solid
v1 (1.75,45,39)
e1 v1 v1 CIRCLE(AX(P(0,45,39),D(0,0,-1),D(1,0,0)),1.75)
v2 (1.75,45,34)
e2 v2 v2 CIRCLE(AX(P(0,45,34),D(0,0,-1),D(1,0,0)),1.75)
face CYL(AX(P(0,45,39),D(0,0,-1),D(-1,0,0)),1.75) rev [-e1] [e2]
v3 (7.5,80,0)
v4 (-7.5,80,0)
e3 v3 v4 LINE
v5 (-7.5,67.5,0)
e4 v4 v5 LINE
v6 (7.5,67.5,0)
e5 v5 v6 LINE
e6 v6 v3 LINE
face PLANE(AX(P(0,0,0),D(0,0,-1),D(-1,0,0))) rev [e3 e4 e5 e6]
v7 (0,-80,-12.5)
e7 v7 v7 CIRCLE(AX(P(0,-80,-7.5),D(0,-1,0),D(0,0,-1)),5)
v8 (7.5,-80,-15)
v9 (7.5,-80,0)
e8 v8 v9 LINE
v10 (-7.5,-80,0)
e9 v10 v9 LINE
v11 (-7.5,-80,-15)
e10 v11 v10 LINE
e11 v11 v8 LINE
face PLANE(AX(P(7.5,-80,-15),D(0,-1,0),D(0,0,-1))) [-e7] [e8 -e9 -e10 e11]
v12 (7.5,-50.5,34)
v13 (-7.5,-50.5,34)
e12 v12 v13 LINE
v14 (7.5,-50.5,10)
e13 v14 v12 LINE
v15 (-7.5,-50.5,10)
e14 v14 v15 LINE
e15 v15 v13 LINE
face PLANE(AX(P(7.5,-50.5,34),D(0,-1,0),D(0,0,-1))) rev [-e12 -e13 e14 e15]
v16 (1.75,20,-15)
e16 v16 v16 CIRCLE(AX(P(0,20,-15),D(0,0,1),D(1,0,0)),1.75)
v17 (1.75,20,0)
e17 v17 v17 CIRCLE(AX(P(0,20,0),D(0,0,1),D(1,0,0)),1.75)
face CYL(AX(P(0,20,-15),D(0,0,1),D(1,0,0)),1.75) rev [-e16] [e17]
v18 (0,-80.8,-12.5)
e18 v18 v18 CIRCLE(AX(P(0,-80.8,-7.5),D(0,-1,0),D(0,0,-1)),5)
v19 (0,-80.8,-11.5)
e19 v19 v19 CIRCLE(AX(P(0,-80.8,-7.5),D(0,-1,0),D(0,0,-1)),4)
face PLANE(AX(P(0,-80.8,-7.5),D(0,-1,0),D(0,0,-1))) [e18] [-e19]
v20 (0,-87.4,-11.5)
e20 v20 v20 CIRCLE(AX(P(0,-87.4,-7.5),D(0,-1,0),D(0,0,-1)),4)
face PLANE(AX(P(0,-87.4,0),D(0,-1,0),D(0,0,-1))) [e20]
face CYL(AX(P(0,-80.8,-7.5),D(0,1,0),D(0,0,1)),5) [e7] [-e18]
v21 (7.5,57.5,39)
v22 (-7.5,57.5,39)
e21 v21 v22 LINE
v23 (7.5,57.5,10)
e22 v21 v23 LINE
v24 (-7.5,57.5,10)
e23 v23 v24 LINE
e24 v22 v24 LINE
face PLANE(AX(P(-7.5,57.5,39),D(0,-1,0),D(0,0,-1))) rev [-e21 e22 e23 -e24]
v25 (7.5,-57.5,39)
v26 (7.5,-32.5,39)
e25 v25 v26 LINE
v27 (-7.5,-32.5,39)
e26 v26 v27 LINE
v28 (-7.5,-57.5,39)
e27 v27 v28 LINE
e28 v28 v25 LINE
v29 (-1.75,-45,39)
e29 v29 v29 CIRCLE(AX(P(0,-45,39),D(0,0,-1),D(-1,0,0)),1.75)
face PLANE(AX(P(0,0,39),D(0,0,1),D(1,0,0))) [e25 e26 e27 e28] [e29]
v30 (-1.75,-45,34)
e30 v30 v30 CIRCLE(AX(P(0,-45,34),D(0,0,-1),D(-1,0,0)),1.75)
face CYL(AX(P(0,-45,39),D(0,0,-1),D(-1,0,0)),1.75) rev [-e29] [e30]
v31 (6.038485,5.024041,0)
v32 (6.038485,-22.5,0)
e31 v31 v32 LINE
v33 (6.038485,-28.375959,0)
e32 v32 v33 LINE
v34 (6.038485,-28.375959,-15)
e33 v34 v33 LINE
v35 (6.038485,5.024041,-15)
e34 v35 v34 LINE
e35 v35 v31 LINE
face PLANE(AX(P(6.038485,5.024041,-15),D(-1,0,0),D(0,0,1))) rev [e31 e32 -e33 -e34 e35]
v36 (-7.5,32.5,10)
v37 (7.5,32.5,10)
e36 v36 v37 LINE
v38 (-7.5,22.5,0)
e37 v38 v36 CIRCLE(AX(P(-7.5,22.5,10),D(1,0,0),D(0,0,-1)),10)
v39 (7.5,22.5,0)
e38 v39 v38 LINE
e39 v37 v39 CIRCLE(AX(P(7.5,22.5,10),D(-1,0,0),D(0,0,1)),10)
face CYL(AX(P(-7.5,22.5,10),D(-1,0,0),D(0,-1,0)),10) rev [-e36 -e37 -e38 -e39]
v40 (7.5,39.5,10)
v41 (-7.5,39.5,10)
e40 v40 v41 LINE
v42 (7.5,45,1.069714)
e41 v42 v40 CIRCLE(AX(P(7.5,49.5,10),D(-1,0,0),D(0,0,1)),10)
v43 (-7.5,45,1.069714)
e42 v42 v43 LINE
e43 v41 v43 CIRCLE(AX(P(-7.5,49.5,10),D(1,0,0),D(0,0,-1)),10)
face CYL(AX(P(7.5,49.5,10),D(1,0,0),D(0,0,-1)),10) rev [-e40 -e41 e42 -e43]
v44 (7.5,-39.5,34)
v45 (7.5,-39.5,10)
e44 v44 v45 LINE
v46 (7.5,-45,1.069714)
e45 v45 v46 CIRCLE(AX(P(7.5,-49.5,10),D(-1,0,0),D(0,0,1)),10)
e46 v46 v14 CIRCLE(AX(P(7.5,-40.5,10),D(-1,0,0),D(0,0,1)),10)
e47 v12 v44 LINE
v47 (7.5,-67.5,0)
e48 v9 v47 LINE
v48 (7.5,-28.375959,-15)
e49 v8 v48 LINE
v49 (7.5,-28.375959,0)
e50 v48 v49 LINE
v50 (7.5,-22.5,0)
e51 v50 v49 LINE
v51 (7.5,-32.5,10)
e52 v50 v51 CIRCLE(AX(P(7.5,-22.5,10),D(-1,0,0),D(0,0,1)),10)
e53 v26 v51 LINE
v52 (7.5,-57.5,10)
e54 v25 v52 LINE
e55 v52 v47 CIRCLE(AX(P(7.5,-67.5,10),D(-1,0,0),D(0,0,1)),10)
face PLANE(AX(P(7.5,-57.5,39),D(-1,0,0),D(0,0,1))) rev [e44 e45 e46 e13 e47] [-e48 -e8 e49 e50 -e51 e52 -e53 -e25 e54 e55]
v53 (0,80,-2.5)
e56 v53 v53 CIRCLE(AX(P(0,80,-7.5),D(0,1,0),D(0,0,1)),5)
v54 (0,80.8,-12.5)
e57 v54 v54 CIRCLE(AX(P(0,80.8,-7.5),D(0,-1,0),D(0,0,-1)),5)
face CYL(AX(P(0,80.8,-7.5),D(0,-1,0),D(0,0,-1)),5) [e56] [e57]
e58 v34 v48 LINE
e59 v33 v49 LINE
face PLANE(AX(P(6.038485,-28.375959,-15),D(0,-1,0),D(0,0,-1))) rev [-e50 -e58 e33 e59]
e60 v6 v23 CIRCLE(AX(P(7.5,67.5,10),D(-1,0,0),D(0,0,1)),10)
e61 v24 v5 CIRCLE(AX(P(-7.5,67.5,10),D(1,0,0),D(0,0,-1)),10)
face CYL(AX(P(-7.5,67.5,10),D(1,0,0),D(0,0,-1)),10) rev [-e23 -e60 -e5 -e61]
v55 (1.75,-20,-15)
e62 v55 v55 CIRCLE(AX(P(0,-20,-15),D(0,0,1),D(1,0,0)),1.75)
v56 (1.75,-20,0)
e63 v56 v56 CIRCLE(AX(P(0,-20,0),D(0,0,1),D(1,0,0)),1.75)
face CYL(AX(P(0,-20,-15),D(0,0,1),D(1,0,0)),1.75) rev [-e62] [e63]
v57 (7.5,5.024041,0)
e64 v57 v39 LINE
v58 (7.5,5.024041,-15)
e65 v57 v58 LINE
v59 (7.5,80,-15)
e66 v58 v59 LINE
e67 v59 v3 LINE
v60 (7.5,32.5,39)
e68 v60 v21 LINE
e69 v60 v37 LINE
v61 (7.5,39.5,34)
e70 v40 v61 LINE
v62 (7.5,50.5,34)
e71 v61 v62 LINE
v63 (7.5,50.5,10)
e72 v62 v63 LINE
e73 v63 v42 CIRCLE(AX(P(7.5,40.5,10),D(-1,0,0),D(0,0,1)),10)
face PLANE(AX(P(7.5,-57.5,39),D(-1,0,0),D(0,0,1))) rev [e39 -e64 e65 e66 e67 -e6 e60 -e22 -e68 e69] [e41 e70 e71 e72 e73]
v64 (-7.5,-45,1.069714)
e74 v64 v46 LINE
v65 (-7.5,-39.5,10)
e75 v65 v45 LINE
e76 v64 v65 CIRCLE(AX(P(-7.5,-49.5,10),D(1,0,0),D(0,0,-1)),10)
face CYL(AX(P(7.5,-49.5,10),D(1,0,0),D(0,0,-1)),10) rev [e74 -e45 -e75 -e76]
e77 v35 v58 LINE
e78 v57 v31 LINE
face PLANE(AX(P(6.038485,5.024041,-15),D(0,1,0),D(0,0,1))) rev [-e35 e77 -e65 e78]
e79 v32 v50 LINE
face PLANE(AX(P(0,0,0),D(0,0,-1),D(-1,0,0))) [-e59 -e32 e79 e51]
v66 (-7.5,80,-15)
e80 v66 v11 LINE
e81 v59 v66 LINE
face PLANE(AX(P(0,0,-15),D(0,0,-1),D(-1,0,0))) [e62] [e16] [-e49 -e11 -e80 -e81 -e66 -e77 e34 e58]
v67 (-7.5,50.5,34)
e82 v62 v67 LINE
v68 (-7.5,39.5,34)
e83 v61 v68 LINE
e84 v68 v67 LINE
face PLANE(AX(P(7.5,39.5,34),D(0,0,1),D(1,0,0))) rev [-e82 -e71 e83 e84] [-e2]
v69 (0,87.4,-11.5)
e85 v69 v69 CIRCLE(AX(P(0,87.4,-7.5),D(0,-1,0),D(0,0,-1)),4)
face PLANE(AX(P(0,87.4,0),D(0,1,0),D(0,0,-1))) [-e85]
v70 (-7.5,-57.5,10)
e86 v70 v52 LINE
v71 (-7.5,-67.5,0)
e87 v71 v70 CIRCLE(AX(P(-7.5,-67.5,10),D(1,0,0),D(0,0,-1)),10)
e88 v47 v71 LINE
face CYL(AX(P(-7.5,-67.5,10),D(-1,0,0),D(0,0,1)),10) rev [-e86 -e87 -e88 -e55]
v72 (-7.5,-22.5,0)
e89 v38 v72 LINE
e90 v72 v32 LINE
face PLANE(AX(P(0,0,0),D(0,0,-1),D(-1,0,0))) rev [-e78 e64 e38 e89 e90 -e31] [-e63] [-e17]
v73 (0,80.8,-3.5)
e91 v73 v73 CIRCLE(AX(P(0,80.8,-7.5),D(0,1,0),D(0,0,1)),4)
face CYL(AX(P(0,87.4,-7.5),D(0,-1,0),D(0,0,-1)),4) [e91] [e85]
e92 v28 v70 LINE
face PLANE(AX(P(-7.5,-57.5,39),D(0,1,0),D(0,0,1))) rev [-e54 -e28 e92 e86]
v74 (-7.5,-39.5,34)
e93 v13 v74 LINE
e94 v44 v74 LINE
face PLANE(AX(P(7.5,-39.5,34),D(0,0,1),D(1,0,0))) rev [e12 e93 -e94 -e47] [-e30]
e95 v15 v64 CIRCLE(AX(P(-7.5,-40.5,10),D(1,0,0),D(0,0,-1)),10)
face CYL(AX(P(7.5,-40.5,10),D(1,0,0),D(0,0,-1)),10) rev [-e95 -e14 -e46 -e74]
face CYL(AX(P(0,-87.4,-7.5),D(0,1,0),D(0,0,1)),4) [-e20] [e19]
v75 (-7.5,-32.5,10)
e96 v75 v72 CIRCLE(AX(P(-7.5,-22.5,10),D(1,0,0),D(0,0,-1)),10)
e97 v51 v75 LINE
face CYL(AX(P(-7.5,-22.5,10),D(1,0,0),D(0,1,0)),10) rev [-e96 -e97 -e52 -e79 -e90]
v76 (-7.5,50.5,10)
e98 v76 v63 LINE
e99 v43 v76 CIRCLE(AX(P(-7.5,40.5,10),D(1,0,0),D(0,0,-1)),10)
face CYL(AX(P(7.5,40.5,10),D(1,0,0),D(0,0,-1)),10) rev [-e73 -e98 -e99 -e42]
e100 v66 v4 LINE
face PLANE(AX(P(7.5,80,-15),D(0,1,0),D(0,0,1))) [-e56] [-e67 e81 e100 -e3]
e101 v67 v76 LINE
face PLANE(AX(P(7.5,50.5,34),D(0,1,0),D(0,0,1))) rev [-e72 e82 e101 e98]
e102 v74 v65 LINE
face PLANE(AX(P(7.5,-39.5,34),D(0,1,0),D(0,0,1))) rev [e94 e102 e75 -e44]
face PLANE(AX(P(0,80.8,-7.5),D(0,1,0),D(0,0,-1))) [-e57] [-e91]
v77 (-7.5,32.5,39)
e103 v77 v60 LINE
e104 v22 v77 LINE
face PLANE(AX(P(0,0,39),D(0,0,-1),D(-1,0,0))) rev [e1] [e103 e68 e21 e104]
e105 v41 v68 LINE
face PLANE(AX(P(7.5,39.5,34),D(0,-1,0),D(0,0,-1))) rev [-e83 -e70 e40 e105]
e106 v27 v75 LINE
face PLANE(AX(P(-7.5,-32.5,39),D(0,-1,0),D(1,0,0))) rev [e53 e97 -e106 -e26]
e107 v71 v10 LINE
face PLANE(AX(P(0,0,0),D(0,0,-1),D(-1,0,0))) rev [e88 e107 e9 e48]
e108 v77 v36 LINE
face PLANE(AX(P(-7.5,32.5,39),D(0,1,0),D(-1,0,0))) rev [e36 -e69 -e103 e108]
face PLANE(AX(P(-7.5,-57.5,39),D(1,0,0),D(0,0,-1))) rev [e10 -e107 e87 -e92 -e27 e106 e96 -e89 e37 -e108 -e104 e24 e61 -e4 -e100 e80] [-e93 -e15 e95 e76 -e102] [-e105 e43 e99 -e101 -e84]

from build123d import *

# Parameters (mm, degrees)
ESQUISSE1_W                      = 25
ESQUISSE1_H                      = 15
BOSS_EXTRU_1_DEPTH               = 39
BOSS_EXTRU_1_2_DEPTH             = 39
ESQUISSE3_W                      = 160
ESQUISSE3_H                      = 15
BOSS_EXTRU_2_DEPTH               = 15
ESQUISSE4_R                      = 5
ESQUISSE4_R_2                    = 4
BOSS_EXTRU_5_DEPTH               = 0.8
ESQUISSE4_6_R                    = 4
BOSS_EXTRU_6_DEPTH               = 7.4
CONG_1_R                         = 10
ESQUISSE5_W                      = 11
ESQUISSE5_H                      = 34
ENL_V_MAT_EXTRU_1_DEPTH          = 97.874970968
CONG_2_R                         = 10
ESQUISSE6_R                      = 1.75
ENL_V_MAT_EXTRU_2_DEPTH          = 101.478903258
ESQUISSE11_R                     = 1.75
TROUS_VIS_SUPPORT_CAPTEURS_DEPTH = 97.000052083
ESQUISSE12_W                     = 33.4
ESQUISSE12_H                     = 4.7
ENCOCHE_CARTE_CAPTEUR_DEPTH      = 97.000052083


with BuildPart() as part:
    # Esquisse1 → Boss.-Extru.1 (new body)
    with BuildSketch(Plane(origin=(0, 0, 0), x_dir=(0, 1, 0), z_dir=(0, 0, 1))):
        with Locations((-45, 0)):
            Rectangle(ESQUISSE1_W, ESQUISSE1_H)
    extrude(amount=BOSS_EXTRU_1_DEPTH)



with BuildPart() as body_2:
    # Esquisse1 → Boss.-Extru.1 2 (new body)
    with BuildSketch(Plane(origin=(0, 0, 0), x_dir=(0, 1, 0), z_dir=(0, 0, 1))):
        with Locations((45, 0)):
            Rectangle(ESQUISSE1_W, ESQUISSE1_H)
    extrude(amount=BOSS_EXTRU_1_2_DEPTH)


with BuildPart() as part_1:
    add(part.part)

    add(body_2.part)  # Boss.-Extru.2 merges body 2
    # Esquisse3 → Boss.-Extru.2 (add)
    with BuildSketch(Plane(origin=(0, 0, 0), x_dir=(0, 1, 0), z_dir=(0, 0, 1))):
        Rectangle(ESQUISSE3_W, ESQUISSE3_H)
    extrude(amount=-BOSS_EXTRU_2_DEPTH)

    # Esquisse4 → Boss.-Extru.5 (add)
    with BuildSketch(Plane(origin=(0, -80, 0), x_dir=(-1, 0, 0), z_dir=(0, -1, 0))):
        with Locations(Location((0, 7.5, 0), (0, 0, 90))):
            Circle(ESQUISSE4_R)
        with Locations(Location((0, 7.5, 0), (0, 0, 90))):
            Circle(ESQUISSE4_R_2, mode=Mode.SUBTRACT)
    boss_extru_5 = extrude(amount=BOSS_EXTRU_5_DEPTH)

    # Esquisse4<6> → Boss.-Extru.6 (add)
    with BuildSketch(Plane(origin=(0, -80, 0), x_dir=(-1, 0, 0), z_dir=(0, -1, 0))):
        with Locations(Location((0, 7.5, 0), (0, 0, 90))):
            Circle(ESQUISSE4_6_R)
    boss_extru_6 = extrude(amount=BOSS_EXTRU_6_DEPTH)

    # Symétrie2: Boss.-Extru.5, Boss.-Extru.6 across plane
    add(boss_extru_5.mirror(Plane.ZX))
    add(boss_extru_6.mirror(Plane.ZX))

    # Congé1
    cong_1_edges = [part_1.edges().sort_by_distance(p)[0] for p in [
        (0, 57.5, 0),
        (0, 32.5, 0),
        (0, -57.5, 0),
        (0, -32.5, 0),
    ]]
    fillet(cong_1_edges, radius=CONG_1_R)

    # Esquisse5 → Enlèv. mat.-Extru.1 (cut, through all)
    with BuildSketch(Plane(origin=(-7.5, 0, 0), x_dir=(0, -1, 0), z_dir=(-1, 0, 0))):
        with Locations((45, 17)):
            Rectangle(ESQUISSE5_W, ESQUISSE5_H)
        with Locations((-45, 17)):
            Rectangle(ESQUISSE5_W, ESQUISSE5_H)
    extrude(amount=-ENL_V_MAT_EXTRU_1_DEPTH, mode=Mode.SUBTRACT)

    # Congé2
    # the kernel refuses this fillet: 10 mm, written as the material it adds along each edge
    with BuildSketch(Plane(origin=(-7.5, 39.5, 0), x_dir=(0, 0, 1), z_dir=(1, 0, 0)), Plane(origin=(-7.5, -39.5, 0), x_dir=(0, -1, 0), z_dir=(1, 0, 0)), Plane(origin=(-7.5, -50.5, 0), x_dir=(0, 0, 1), z_dir=(1, 0, 0))) as cong_2_piece_1:
        with BuildLine():
            CenterArc((CONG_2_R, -CONG_2_R), CONG_2_R, 90, 90)
            Line((0, -CONG_2_R), (0, 0))
            Line((0, 0), (CONG_2_R, 0))
        make_face()
    extrude(amount=15)
    with BuildSketch(Plane(origin=(-7.5, 50.5, 0), x_dir=(0, 0, 1), z_dir=(1, 0, 0))) as cong_2_piece_2:
        with BuildLine():
            CenterArc((CONG_2_R, CONG_2_R), CONG_2_R, 180, 90)
            Line((0, CONG_2_R), (0, 0))
            Line((0, 0), (CONG_2_R, 0))
        make_face()
    extrude(amount=15)

    # Esquisse6 → Enlèv. mat.-Extru.2 (cut, through all)
    with BuildSketch(Plane(origin=(0, 0, 34), x_dir=(1, 0, 0), z_dir=(0, 0, -1))):
        with Locations(Location((0, 45, 0), (0, 0, 180))):
            Circle(ESQUISSE6_R)
        with Locations((0, -45)):
            Circle(ESQUISSE6_R)
    extrude(amount=-ENL_V_MAT_EXTRU_2_DEPTH, mode=Mode.SUBTRACT)

    # Esquisse11 → Trous vis support capteurs (cut, through all)
    with BuildSketch(Plane(origin=(0, 0, 0), x_dir=(0, 1, 0), z_dir=(0, 0, 1))):
        with Locations(Location((20, 0, 0), (0, 0, 270))):
            Circle(ESQUISSE11_R)
        with Locations(Location((-20, 0, 0), (0, 0, 270))):
            Circle(ESQUISSE11_R)
    extrude(amount=-TROUS_VIS_SUPPORT_CAPTEURS_DEPTH, mode=Mode.SUBTRACT)

    # Esquisse12 → Encoche carte capteur (cut, through all)
    with BuildSketch(Plane(origin=(0, 0, 0), x_dir=(0, 1, 0), z_dir=(0, 0, 1))):
        with Locations((-11.675958981, -8.388484641)):
            Rectangle(ESQUISSE12_W, ESQUISSE12_H)
    extrude(amount=-ENCOCHE_CARTE_CAPTEUR_DEPTH, mode=Mode.SUBTRACT)


solid = part_1.part
